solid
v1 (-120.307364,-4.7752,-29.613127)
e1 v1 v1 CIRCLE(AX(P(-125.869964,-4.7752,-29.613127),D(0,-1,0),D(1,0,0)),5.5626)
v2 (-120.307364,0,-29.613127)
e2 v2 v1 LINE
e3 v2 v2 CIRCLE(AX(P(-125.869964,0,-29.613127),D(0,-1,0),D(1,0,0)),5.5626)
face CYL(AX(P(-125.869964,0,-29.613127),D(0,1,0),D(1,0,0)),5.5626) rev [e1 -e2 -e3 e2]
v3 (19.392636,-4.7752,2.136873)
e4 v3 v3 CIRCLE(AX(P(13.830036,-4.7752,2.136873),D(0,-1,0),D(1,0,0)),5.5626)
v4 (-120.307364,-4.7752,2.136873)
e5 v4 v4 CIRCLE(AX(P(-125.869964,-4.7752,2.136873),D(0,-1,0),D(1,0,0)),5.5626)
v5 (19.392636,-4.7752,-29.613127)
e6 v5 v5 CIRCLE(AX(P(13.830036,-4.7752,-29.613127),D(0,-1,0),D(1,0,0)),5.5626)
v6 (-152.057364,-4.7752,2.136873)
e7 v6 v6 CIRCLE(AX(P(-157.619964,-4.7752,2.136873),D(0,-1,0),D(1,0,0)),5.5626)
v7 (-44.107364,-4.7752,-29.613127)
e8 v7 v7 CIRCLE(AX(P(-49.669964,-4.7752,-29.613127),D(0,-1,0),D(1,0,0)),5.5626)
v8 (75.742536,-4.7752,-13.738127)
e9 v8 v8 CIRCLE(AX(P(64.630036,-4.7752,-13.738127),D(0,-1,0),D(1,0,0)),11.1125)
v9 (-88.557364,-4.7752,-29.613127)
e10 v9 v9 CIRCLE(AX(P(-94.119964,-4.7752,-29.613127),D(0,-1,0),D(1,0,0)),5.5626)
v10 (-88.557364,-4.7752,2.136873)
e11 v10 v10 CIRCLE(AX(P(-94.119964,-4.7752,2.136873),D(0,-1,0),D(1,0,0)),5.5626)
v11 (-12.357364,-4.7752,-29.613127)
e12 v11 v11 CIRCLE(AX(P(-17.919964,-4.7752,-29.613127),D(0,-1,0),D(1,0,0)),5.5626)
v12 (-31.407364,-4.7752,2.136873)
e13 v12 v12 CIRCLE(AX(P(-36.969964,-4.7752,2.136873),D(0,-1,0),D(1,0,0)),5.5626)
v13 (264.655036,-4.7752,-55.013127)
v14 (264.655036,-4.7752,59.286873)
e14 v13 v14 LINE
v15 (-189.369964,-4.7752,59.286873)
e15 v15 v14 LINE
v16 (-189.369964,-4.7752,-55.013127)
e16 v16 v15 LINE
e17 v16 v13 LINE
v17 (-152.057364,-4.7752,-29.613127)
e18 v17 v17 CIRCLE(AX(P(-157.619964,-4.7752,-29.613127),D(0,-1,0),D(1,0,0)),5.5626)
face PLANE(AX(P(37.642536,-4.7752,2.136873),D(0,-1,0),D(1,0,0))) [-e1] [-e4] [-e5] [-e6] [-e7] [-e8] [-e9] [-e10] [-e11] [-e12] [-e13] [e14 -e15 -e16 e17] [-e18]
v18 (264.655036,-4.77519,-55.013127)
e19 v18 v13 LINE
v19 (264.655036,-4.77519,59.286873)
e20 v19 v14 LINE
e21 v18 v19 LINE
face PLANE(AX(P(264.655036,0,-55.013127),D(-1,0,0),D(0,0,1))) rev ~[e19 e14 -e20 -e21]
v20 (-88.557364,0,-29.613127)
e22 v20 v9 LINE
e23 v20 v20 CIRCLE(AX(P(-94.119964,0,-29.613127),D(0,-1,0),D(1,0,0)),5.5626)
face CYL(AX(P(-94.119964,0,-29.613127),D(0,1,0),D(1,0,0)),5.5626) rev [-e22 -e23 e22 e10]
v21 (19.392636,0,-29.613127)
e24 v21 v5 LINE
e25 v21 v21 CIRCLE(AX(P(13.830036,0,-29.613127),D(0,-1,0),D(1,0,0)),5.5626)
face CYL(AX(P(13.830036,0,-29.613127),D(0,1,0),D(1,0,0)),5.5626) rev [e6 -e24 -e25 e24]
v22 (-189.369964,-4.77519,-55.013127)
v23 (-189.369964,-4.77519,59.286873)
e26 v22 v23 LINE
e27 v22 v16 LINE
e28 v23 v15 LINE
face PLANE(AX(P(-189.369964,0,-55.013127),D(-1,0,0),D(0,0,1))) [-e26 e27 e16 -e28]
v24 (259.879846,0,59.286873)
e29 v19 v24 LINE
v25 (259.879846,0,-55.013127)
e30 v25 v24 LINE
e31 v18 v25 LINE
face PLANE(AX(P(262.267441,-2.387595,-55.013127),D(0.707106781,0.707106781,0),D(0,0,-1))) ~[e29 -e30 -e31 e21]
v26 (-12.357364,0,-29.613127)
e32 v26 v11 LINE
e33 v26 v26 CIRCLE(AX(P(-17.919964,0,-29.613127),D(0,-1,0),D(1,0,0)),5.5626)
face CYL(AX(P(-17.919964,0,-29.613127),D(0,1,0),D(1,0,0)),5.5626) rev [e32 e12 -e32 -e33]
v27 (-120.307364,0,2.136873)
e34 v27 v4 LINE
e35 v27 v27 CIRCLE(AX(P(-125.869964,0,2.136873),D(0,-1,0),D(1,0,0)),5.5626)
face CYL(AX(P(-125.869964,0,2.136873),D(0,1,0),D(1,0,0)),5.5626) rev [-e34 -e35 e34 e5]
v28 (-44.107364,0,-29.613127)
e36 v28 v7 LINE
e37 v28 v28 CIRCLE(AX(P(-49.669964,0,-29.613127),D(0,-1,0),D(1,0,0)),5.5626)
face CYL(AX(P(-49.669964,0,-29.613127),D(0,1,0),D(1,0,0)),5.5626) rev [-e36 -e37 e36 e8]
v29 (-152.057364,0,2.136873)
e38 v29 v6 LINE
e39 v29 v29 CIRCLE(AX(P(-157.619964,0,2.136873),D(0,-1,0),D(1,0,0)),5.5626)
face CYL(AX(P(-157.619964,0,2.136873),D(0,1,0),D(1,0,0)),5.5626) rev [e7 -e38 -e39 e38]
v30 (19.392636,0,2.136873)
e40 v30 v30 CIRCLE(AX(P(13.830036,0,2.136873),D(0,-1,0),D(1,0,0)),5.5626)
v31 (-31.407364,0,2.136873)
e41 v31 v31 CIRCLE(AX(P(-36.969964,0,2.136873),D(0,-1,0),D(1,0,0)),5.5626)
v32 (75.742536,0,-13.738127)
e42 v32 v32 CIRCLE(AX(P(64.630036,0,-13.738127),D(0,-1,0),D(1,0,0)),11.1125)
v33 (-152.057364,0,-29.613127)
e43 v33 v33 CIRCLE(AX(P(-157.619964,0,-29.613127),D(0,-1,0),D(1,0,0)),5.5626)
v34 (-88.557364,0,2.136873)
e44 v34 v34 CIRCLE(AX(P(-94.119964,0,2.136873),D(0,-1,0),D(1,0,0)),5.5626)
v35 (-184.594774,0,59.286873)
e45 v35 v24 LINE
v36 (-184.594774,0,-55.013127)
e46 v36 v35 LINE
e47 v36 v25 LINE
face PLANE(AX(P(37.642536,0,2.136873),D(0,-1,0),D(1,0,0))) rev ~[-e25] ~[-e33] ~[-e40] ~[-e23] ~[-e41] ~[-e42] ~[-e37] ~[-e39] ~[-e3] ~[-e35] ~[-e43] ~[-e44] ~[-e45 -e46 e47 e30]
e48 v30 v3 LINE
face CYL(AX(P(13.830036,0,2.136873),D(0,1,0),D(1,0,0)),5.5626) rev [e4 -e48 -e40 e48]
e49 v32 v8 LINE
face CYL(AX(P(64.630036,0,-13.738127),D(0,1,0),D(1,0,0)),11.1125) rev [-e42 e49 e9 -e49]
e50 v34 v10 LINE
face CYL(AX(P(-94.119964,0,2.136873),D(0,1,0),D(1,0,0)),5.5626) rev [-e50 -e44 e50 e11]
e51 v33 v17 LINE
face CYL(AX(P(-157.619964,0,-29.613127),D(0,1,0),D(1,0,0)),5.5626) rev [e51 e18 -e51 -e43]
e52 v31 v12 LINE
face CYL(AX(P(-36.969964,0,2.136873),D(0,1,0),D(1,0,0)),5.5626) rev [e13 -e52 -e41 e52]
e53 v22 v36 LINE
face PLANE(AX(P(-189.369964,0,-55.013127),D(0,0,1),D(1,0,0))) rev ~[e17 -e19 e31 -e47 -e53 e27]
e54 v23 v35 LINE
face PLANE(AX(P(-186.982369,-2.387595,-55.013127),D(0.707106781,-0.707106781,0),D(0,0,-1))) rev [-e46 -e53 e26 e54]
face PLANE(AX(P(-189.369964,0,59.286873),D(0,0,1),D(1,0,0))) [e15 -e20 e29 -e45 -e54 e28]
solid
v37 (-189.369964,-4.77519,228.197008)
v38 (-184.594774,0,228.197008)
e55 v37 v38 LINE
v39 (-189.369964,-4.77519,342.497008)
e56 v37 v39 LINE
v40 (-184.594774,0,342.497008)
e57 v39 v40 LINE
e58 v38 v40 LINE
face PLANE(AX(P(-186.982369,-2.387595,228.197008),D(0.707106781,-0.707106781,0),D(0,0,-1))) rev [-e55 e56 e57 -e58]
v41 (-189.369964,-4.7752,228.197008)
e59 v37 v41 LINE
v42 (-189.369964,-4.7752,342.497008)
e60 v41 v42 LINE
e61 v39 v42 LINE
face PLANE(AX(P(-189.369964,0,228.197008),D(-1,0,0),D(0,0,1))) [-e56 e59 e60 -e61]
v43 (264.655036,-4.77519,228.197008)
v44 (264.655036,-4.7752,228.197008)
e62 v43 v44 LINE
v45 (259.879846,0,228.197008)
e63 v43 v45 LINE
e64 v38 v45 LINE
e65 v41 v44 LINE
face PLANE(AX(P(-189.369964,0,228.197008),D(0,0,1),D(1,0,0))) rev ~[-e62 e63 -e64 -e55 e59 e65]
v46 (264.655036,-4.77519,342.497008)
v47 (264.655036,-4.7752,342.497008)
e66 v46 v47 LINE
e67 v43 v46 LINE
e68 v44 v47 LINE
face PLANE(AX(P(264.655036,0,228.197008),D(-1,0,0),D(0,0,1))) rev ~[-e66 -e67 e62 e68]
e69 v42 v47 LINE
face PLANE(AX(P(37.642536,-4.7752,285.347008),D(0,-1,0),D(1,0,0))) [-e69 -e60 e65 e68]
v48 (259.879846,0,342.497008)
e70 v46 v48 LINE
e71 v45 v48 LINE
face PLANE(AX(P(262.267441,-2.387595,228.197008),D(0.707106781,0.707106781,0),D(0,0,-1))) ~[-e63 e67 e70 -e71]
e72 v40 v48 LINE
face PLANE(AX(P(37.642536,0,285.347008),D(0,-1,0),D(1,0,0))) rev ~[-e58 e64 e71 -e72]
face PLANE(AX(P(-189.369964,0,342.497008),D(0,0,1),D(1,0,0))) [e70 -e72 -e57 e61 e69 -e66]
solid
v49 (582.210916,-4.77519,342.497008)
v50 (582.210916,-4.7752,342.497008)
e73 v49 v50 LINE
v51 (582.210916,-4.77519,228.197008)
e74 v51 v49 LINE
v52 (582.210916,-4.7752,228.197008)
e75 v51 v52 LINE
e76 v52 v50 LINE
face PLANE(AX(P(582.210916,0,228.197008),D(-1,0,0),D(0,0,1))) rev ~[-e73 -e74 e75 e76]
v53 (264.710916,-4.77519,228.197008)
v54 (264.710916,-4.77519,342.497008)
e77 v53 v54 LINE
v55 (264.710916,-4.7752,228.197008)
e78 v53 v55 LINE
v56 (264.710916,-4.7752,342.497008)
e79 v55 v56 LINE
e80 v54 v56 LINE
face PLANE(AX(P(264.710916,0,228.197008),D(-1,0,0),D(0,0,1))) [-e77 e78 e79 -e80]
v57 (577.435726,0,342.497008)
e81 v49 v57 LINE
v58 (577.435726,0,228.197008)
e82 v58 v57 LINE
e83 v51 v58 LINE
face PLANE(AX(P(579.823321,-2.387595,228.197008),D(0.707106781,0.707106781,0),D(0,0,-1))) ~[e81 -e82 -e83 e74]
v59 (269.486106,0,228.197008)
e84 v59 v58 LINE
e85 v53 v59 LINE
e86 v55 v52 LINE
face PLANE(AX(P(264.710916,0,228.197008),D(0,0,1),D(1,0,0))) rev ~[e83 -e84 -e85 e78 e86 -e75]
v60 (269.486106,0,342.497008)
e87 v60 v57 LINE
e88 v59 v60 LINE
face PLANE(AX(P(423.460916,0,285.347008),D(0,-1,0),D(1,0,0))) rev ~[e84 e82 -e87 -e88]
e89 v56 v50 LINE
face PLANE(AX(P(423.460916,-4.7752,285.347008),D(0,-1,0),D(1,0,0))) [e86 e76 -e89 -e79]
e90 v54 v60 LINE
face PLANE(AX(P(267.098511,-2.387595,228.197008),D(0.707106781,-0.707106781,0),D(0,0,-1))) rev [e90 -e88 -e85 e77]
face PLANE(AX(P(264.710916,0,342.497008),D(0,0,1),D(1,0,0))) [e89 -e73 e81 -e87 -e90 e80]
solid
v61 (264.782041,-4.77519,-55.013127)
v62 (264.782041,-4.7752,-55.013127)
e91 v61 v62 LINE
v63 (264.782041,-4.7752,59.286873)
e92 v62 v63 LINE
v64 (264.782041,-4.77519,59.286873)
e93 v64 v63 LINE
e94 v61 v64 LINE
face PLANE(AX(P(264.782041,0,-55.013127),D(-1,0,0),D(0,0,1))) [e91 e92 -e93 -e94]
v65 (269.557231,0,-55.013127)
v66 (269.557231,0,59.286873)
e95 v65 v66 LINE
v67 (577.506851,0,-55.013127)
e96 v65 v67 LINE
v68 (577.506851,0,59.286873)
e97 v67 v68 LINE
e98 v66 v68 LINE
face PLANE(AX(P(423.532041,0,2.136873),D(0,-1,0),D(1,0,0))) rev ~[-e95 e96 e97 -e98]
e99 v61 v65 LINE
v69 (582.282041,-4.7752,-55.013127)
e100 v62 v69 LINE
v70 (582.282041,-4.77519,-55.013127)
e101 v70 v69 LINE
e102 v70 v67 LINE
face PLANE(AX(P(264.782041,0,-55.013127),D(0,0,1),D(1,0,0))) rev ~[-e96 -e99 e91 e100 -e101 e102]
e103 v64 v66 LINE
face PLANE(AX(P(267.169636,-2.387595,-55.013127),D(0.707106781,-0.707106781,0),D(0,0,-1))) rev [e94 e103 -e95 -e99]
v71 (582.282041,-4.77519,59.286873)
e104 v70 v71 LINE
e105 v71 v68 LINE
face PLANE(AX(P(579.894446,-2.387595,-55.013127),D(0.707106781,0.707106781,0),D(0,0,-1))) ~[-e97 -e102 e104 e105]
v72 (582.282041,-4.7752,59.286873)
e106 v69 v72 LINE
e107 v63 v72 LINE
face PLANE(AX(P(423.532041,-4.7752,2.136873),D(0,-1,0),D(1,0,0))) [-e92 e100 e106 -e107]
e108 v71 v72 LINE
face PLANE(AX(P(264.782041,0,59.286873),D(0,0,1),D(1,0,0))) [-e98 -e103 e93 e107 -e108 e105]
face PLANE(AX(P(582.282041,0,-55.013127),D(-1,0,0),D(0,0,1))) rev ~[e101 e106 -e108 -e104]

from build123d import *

# Parameters (mm, degrees)
F0_W      = 454.025
F0_H      = 114.3
F0_R      = 5.5626
F0_R_2    = 11.1125
F1_DEPTH  = 4.7752
F0_W_2    = 317.5
F2_SIZE   = 4.77519
F2_2_SIZE = 4.77519
F2_3_SIZE = 4.77519
F2_4_SIZE = 4.77519


# Not quite as in the source:
# - a fillet or chamfer is up to 0.001 mm smaller than in the source, because OpenCascade refuses the exact size
# - a feature names something its author has since deleted; it is built from what else it names


with BuildPart() as f1:
    # F0 (on Front) → F1 (new body)
    with BuildSketch(Plane.XZ):
        with Locations((37.6425363503, 2.1368730813)):
            Rectangle(F0_W, F0_H)
        with Locations((-157.6199636497, -29.6131269187)):
            Circle(F0_R, mode=Mode.SUBTRACT)
        with Locations((-125.8699636497, -29.6131269187)):
            Circle(F0_R, mode=Mode.SUBTRACT)
        with Locations((-94.1199636497, -29.6131269187)):
            Circle(F0_R, mode=Mode.SUBTRACT)
        with Locations((-49.6699636497, -29.6131269187)):
            Circle(F0_R, mode=Mode.SUBTRACT)
        with Locations((-17.9199636497, -29.6131269187)):
            Circle(F0_R, mode=Mode.SUBTRACT)
        with Locations((-157.6199636497, 2.1368730813)):
            Circle(F0_R, mode=Mode.SUBTRACT)
        with Locations((-125.8699636497, 2.1368730813)):
            Circle(F0_R, mode=Mode.SUBTRACT)
        with Locations((-94.1199636497, 2.1368730813)):
            Circle(F0_R, mode=Mode.SUBTRACT)
        with Locations((-36.9699636497, 2.1368730813)):
            Circle(F0_R, mode=Mode.SUBTRACT)
        with Locations((13.8300363503, -29.6131269187)):
            Circle(F0_R, mode=Mode.SUBTRACT)
        with Locations((64.6300363503, -13.7381269187)):
            Circle(F0_R_2, mode=Mode.SUBTRACT)
        with Locations((13.8300363503, 2.1368730813)):
            Circle(F0_R, mode=Mode.SUBTRACT)
    extrude(amount=F1_DEPTH)

    # F2#2 (size 4.7752 in the source; OpenCascade refuses exactly that, so slightly less here)
    f2_2_edges = [f1.edges().sort_by_distance(p)[0] for p in [
        (264.655036, 0, 2.136873),
        (-189.369964, 0, 2.136873),
    ]]
    chamfer(f2_2_edges, length=F2_2_SIZE)


with BuildPart() as f1b:
    # F0 (on Front) → F1, piece 2 (new body)
    with BuildSketch(Plane.XZ):
        with Locations((37.6425363503, 285.3470083714)):
            Rectangle(F0_W, F0_H)
    extrude(amount=F1_DEPTH)

    # F2 (size 4.7752 in the source; OpenCascade refuses exactly that, so slightly less here)
    f2_edges = [f1b.edges().sort_by_distance(p)[0] for p in [
        (264.655036, 0, 285.347008),
        (-189.369964, 0, 285.347008),
    ]]
    chamfer(f2_edges, length=F2_SIZE)


with BuildPart() as f1c:
    # F0 (on Front) → F1, piece 3 (new body)
    with BuildSketch(Plane.XZ):
        with Locations((423.5320413113, 2.1368730813)):
            Rectangle(F0_W_2, F0_H)
    extrude(amount=F1_DEPTH)

    # F2#3 (size 4.7752 in the source; OpenCascade refuses exactly that, so slightly less here)
    f2_3_edges = [f1c.edges().sort_by_distance(p)[0] for p in [
        (582.282041, 0, 2.136873),
        (264.782041, 0, 2.136873),
    ]]
    chamfer(f2_3_edges, length=F2_3_SIZE)


with BuildPart() as f1d:
    # F0 (on Front) → F1, piece 4 (new body)
    with BuildSketch(Plane.XZ):
        with Locations((423.4609160386, 285.3470083714)):
            Rectangle(F0_W_2, F0_H)
    extrude(amount=F1_DEPTH)

    # F2#4 (size 4.7752 in the source; OpenCascade refuses exactly that, so slightly less here)
    f2_4_edges = [f1d.edges().sort_by_distance(p)[0] for p in [
        (264.710916, 0, 285.347008),
        (582.210916, 0, 285.347008),
    ]]
    chamfer(f2_4_edges, length=F2_4_SIZE)


solid = Compound([f1.part, f1b.part, f1c.part, f1d.part])
